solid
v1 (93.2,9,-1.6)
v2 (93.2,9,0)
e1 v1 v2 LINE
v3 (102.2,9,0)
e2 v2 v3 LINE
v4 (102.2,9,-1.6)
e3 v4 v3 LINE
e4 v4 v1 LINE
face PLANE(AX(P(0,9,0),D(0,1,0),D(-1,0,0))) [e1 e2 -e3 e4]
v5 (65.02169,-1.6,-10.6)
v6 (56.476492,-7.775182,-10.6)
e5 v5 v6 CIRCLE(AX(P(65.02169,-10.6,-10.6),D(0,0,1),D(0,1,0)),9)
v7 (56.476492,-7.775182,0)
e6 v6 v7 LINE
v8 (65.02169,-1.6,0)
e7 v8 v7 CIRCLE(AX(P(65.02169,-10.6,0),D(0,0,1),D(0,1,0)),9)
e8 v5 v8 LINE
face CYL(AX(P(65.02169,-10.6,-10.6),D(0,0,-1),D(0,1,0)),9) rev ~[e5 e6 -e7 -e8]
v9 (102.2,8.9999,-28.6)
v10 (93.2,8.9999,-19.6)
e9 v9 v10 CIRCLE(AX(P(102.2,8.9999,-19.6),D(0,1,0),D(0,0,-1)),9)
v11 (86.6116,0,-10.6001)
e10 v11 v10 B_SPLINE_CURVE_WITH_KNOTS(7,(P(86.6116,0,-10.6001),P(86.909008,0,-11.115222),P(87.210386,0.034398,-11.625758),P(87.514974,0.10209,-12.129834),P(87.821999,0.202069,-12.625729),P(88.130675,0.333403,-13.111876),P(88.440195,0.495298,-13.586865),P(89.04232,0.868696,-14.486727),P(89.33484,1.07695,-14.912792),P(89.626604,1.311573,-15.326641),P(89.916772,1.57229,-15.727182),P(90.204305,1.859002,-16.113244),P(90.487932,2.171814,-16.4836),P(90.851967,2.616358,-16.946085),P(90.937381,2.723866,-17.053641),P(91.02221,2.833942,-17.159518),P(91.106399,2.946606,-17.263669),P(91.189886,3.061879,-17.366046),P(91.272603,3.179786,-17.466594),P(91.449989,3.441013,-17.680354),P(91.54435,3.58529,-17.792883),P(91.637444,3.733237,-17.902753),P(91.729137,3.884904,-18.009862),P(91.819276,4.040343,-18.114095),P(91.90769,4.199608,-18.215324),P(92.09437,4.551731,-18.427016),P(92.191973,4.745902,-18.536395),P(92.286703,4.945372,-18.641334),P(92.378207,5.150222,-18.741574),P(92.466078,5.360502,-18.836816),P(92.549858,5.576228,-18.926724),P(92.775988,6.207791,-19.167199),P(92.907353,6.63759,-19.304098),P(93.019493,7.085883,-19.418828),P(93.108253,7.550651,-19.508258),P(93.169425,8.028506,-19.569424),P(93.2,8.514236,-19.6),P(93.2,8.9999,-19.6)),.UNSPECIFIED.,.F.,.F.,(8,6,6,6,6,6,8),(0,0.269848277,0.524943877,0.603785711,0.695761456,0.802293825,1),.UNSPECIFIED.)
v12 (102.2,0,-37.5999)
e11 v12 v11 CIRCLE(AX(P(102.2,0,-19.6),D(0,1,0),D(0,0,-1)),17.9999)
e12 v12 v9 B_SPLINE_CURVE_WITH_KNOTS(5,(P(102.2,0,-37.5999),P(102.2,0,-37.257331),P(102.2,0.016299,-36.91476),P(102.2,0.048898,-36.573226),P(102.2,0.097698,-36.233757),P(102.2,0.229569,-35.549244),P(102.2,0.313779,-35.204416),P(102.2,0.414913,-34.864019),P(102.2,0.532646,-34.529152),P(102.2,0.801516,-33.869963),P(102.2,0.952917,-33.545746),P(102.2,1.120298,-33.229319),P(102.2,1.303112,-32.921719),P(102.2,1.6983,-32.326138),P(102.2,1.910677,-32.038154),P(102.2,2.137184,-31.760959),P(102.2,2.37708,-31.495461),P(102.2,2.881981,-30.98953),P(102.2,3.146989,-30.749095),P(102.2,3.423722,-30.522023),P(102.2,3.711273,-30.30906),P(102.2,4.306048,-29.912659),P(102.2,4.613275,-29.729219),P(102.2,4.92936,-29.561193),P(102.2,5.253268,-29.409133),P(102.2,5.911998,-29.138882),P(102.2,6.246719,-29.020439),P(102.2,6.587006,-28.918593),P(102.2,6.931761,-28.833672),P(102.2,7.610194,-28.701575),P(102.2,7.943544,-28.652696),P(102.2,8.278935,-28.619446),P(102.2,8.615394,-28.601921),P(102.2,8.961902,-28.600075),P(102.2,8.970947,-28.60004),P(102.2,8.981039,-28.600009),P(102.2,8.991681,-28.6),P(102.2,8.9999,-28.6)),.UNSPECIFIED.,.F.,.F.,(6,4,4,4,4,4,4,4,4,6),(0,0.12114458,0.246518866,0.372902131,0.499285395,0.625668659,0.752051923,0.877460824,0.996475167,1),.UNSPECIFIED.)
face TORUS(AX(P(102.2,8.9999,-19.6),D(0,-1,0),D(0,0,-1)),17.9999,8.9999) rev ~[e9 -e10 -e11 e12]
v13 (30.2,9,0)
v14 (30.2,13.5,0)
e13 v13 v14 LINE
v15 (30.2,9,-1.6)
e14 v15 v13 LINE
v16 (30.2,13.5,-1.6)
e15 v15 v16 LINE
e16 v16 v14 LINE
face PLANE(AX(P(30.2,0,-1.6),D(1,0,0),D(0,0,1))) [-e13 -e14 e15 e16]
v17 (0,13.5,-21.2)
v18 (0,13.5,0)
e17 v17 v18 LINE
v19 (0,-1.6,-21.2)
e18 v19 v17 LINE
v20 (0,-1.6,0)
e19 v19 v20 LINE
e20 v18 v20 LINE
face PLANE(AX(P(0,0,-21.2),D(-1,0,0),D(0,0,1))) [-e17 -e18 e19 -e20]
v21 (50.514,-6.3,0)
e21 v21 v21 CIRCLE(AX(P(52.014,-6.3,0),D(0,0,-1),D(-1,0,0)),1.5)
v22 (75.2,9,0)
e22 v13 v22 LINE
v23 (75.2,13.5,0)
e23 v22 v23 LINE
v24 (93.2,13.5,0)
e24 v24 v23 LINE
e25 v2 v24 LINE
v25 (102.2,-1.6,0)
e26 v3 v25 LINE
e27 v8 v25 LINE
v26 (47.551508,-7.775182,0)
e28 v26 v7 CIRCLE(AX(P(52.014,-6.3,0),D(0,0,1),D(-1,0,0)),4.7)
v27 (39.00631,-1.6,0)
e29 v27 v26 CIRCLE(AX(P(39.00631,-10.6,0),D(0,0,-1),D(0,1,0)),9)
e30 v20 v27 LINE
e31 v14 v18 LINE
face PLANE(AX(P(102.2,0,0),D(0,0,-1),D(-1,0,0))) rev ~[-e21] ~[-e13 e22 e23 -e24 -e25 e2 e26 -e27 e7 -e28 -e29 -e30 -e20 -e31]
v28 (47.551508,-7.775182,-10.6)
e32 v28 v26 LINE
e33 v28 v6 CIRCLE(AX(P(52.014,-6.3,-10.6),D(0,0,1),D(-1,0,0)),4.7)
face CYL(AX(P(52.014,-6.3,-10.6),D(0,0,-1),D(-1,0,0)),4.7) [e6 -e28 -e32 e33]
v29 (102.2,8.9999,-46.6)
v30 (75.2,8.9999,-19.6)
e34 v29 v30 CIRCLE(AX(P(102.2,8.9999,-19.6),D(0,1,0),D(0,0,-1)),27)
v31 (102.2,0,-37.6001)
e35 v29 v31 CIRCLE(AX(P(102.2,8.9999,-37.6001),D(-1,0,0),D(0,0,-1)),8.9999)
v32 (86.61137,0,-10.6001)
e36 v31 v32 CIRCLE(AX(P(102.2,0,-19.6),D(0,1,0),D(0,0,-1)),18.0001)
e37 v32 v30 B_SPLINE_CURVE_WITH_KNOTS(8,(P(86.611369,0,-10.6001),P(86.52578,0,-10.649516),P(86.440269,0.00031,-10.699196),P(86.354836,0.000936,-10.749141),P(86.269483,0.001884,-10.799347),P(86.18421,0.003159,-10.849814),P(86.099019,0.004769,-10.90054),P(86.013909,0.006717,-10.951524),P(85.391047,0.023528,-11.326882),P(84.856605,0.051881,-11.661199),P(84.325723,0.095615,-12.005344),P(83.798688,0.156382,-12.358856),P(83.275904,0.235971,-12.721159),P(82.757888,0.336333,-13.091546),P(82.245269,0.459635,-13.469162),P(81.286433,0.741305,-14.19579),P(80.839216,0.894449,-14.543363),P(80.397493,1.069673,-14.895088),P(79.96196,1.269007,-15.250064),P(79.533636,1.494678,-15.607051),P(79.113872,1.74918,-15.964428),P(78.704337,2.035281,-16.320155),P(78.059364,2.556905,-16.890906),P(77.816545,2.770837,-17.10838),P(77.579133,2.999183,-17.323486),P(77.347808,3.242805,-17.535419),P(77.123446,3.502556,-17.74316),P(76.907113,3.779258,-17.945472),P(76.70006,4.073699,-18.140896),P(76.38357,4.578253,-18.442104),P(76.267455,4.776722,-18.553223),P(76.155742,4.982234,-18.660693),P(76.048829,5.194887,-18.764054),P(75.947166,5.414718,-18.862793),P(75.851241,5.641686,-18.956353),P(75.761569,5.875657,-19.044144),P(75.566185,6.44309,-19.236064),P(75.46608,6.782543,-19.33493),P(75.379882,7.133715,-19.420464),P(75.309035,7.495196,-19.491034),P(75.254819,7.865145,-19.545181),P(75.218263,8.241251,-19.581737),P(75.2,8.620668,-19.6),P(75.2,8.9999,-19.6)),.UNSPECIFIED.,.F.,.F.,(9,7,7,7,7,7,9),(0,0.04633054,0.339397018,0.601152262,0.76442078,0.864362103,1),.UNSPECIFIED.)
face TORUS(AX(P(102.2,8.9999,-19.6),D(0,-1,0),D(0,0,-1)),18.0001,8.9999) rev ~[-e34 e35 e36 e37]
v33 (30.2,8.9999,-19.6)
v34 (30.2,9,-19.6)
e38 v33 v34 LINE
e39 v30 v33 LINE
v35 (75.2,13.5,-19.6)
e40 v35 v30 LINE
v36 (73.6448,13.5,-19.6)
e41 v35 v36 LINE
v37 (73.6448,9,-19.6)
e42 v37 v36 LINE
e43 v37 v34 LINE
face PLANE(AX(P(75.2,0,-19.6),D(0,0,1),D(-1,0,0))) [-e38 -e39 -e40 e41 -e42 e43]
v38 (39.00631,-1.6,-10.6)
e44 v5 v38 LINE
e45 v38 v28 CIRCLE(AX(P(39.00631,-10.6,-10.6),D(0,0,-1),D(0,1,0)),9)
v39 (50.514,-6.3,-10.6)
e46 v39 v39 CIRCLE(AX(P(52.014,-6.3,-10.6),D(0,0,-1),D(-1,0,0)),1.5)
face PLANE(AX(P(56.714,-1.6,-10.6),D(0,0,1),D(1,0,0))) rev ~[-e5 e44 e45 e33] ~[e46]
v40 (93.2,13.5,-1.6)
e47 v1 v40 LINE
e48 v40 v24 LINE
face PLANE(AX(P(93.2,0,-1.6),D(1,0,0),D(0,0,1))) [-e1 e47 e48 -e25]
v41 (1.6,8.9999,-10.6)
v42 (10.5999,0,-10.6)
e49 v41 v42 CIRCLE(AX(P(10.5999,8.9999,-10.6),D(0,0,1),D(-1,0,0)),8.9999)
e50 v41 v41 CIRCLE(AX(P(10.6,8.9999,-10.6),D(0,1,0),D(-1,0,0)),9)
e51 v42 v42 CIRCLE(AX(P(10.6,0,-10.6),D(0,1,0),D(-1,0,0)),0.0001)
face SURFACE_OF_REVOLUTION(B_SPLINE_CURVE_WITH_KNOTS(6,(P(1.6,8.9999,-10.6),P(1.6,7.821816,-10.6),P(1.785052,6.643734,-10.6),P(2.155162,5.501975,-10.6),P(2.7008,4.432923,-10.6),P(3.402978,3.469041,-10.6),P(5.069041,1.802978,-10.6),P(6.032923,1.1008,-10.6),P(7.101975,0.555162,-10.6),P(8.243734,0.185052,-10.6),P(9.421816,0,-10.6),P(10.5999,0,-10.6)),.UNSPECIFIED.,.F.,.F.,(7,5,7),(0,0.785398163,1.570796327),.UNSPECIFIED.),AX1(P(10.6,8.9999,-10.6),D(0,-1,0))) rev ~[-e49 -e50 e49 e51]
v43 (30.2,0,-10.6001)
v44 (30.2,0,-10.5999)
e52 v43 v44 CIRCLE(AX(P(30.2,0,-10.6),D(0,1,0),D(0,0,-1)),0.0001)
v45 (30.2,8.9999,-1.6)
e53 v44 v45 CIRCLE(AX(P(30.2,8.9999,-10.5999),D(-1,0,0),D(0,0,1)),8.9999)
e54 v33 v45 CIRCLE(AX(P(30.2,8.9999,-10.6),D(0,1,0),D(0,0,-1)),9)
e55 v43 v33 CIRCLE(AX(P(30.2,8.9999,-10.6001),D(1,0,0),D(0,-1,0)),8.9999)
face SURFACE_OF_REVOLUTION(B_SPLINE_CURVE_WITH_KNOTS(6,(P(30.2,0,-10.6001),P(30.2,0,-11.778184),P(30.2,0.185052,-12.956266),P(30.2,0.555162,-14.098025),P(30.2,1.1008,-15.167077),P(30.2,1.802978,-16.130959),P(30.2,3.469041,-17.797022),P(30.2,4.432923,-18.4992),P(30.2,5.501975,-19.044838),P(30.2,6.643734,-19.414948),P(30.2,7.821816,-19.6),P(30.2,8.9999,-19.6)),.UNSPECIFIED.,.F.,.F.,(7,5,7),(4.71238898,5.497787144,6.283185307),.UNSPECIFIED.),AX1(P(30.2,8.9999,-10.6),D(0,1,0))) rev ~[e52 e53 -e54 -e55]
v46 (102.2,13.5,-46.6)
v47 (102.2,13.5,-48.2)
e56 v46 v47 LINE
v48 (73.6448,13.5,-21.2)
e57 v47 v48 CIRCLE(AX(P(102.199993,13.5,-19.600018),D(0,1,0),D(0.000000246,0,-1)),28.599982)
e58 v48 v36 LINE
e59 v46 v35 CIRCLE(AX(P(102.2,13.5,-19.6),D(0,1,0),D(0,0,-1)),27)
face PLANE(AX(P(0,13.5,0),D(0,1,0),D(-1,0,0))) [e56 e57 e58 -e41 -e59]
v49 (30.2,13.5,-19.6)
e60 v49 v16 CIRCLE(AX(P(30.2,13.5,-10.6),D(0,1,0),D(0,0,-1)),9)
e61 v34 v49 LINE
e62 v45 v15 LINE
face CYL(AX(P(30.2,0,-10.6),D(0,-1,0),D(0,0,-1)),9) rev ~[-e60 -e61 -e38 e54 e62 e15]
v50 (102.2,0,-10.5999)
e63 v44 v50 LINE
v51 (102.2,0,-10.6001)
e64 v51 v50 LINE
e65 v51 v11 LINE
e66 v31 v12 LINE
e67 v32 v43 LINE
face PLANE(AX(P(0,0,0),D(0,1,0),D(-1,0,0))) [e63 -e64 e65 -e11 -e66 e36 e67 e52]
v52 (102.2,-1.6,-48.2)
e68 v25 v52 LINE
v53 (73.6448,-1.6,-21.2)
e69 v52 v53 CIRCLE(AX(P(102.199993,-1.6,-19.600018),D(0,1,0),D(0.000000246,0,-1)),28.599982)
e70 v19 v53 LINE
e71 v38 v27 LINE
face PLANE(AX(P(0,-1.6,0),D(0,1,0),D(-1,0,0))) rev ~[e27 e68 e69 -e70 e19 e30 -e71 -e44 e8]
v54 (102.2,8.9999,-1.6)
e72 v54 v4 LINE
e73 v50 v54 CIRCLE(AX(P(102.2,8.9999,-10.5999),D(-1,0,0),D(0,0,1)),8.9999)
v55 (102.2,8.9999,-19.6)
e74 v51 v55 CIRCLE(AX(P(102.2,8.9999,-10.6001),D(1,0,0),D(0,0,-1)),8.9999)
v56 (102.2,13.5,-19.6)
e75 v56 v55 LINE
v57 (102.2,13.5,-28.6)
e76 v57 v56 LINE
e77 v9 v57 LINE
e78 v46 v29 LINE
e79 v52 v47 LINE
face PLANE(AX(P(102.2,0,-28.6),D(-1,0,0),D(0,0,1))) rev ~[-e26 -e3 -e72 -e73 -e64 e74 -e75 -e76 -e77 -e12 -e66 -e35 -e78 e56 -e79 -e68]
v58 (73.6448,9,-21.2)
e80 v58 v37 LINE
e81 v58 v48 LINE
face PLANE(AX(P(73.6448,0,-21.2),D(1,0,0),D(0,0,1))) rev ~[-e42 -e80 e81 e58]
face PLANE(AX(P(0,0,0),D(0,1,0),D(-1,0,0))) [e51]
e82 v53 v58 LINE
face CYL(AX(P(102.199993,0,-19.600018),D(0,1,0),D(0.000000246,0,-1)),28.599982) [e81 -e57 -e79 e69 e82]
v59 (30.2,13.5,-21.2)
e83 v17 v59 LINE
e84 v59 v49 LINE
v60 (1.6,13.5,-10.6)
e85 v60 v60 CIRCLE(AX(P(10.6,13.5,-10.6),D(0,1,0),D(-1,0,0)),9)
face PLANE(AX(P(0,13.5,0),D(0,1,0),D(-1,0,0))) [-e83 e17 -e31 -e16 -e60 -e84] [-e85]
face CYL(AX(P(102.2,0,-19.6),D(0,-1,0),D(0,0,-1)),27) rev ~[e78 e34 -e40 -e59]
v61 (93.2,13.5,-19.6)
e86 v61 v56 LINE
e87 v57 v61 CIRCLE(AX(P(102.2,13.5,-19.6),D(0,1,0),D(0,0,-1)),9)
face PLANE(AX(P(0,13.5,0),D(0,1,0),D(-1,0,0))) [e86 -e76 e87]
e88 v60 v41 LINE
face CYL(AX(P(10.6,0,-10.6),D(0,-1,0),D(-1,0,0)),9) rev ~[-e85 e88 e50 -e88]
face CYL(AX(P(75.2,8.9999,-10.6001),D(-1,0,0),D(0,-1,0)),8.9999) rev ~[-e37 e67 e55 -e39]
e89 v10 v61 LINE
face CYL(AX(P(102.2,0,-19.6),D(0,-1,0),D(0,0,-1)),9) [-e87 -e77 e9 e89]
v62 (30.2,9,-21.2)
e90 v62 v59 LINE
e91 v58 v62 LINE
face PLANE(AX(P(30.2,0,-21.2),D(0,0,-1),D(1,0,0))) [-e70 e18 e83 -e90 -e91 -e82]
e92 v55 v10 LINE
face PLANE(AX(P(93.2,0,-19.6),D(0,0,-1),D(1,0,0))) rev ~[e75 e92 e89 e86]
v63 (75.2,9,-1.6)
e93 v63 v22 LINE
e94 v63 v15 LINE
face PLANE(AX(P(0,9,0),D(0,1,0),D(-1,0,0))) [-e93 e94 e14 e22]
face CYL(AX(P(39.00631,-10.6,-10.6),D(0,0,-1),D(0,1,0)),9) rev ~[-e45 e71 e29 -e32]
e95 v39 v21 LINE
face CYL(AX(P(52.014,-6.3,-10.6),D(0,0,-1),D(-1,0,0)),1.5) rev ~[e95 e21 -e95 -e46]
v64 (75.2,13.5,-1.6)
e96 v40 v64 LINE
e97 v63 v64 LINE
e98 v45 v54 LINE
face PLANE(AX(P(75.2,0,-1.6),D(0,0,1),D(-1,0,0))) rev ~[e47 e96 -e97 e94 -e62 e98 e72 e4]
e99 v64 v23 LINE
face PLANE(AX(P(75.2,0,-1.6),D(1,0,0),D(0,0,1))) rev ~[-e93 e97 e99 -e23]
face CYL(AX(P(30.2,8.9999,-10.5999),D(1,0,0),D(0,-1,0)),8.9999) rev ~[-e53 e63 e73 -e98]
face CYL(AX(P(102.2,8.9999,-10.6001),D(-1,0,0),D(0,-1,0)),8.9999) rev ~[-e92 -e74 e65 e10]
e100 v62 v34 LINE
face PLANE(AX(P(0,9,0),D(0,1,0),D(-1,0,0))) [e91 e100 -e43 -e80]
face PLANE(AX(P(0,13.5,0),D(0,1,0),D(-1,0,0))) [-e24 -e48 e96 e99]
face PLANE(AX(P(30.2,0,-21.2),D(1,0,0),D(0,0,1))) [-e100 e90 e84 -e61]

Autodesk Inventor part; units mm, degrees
ref_plane "YZ Plane" through (0, 0, 0) normal (1, 0, 0) x (0, 1, 0)
ref_plane "XZ Plane" through (0, 0, 0) normal (0, 1, 0) x (-1, 0, 0)
ref_plane "XY Plane" through (0, 0, 0) normal (0, 0, 1) x (1, 0, 0)
sketch "Esboço1" plane through (0, 0, 0) normal (0, 1, 0) x (-1, 0, 0)
  arc A0 (-102.2, -28.6) -> (-93.2, -19.6) centre (-102.2, -19.6) ccw
  arc A1 (-102.2, -46.6) -> (-75.2, -19.6) centre (-102.2, -19.6) ccw
  line L0 (-75.2, -19.6) -> (-30.2, -19.6)
  line L1 (-93.2, -19.6) -> (-102.2, -19.6)
  line L2 (-102.2, -19.6) -> (-102.2, -1.6)
  line L3 (-102.2, -1.6) -> (-93.2, -1.6)
  line L4 (-93.2, -1.6) -> (-75.2, -1.6)
  line L5 (-75.2, -1.6) -> (-30.2, -1.6)
  arc A2 (-30.2, -19.6) -> (-30.2, -1.6) centre (-30.2, -10.6) ccw
  line L6 (-102.2, -28.6) -> (-102.2, -46.6)
  arc A3 (-102.2, -48.2) -> (-73.6448, -21.2) centre (-102.2, -19.6) ccw
  arc A4 (-102.2, -27) -> (-94.975, -21.2) centre (-102.2, -19.6) ccw
  line L7 (-94.975, -21.2) -> (-102.2, -21.2)
  line L8 (-102.2, 0) -> (-93.2, 0)
  line L9 (-93.2, 0) -> (-75.2, 0)
  line L10 (-75.2, 0) -> (0, 0)
  line L11 (0, -21.2) -> (-73.6448, -21.2)
  line L12 (-73.6448, -21.2) -> (-73.6448, -19.6)
  line L13 (-102.2, -46.6) -> (-102.2, -48.2)
  line L14 (-102.2, -28.6) -> (-102.2, -27)
  line L15 (-102.2, -21.2) -> (-102.2, -19.6)
  line L16 (-102.2, -1.6) -> (-102.2, 0)
  line L17 (-94.975, -21.2) -> (-94.975, -19.6)
  line L18 (-93.2, -1.6) -> (-93.2, 0)
  line L19 (-75.2, -1.6) -> (-75.2, 0)
  line L20 (0, -21.2) -> (0, 0)
  circle A5 centre (-10.6, -10.6) radius 9
  line L21 (-30.2, -21.2) -> (-30.2, -19.6)
  line L22 (-30.2, -1.6) -> (-30.2, 0)
  line L23 (-102.2, -21.2) -> (-102.2, -27)
  point P0 (-21.2, -10.6)
  point P1 (-73.6448, -21.2)
  point P2 (-30.2, -1.6)
  point P3 (-30.2, -19.6)
  dimension "d20" = 18
  dimension "d21" = 18
  dimension "d22" = 54
  dimension "d23" = 1.6
  dimension "d30" = 1.6
  dimension "d31" = 1.6
  dimension "d32" = 1.6
  dimension "d33" = 9
  dimension "d35" = 18
  dimension "d38" = 1.6
  dimension "d44" = 1.6
  dimension "d45" = 1.6
extrude "Margem externa" add sketch "Esboço1" against normal blind 1.6 contours L14 A4 L17 L1 A0 | A0 L1 L2 L3 L4 L5 A2 L0 A1 L6 | A1 L0 L12 A3 L13 | L23 L7 A4 | L17 L7 L15 L1 | L0 L21 L11 L12 | L16 L8 L18 L3 | A2 L22 L10 L20 L11 L21 | L18 L9 L19 L4 | L5 L19 L10 L22 | A5
extrude "Proteção alta" add sketch "Esboço1" along normal blind 13.5 contours L14 A4 L17 L1 A0 | A1 L0 L12 A3 L13 | L23 L7 A4 | L17 L7 L15 L1 | A2 L22 L10 L20 L11 L21 | L18 L9 L19 L4
extrude "Proteção baixa" add sketch "Esboço1" along normal blind 9 contours L14 A4 L17 L1 A0 | A1 L0 L12 A3 L13 | L17 L7 L15 L1 | L0 L21 L11 L12 | L16 L8 L18 L3 | A2 L22 L10 L20 L11 L21 | L18 L9 L19 L4 | L5 L19 L10 L22
fillet "Arredondamento3" radius 9 7 edges at (19.6, 0, -10.6) (66.2, 0, -1.6) (52.7, 0, -19.6) (21.2, 0, -10.6) (83.1081, 0, -38.6919) (97.7, 0, -19.6) (95.836, 0, -25.964)
sketch "Esboço2" plane through (0, -1.6, 0) normal (0, -1, 0) x (1, 0, 0)
  line L0 (59.514, 0) -> (44.514, 0)
  line L1 (44.514, 0) -> (44.514, -10.6)
  line L2 (44.514, -10.6) -> (59.514, -10.6)
  line L3 (59.514, -10.6) -> (59.514, 0)
  line L4 (0, 0) -> (0, -21.2) projected
  point P0 (52.014, -10.6)
  point P1 (0, -10.6)
  point P2 (52.014, 0)
  dimension "d47" = 52.014
  dimension "d48" = 15
extrude "Extrusão5" add sketch "Esboço2" along normal blind 9.4
sketch "Esboço3" plane through (59.514, -1.6, -10.6) normal (0, 0, -1) x (-1, 0, 0)
  circle A0 centre (7.5, -4.7) radius 1.5
  line L0 (15, -9.4) -> (0, -9.4) projected
  line L1 (15, 0) -> (15, -9.4) projected
  line L2 (59.514, 0) -> (-14.1308, 0) projected
  line L3 (12.2, 0) -> (15, 0)
  line L4 (15, 0) -> (15, -9.4)
  line L5 (15.1598, -9.4) -> (0, -9.4)
  line L6 (0, -9.4) -> (0, 0)
  line L7 (0, 0) -> (2.8, 0)
  circle A1 centre (7.5, -4.7) radius 4.7
  line L8 (12.2, 0) -> (12.2, -4.7)
  line L9 (2.8, 0) -> (2.8, -4.7)
  point P0 (59.514, 1.6)
  point P1 (7.5, -9.4)
  point P2 (15, -4.7)
  point P3 (9, -4.7)
  point P4 (6, -4.7)
  point P5 (7.5, -9.4)
  dimension "d51" = 3
  dimension "d54" = 3.2
extrude "Extrusão6" cut sketch "Esboço3" against normal through all contours A0 | L0 A1 L8 L2 L1 | L0 L6 L2 L9 A1
fillet "Arredondamento4" radius 9 2 edges at (56.714, -1.6, -5.3) (47.314, -1.6, -5.3)
equation "\"d20\" = Esfera"
equation "\"d21\" = Esfera"
equation "\"d22\" = 3 * Esfera"
equation "\"d23\" = Margem"
equation "\"d30\" = Margem"
equation "\"d31\" = Margem"
equation "\"d28\" = Margem"
equation "\"d24\" = 0.75 * Esfera"
equation "\"Esfera\" = 18"
equation "\"Margem\" = 1.6"
equation "\"Furo\" = 3"
properties part number "Trilho 5 min" material "Plástico PET"
